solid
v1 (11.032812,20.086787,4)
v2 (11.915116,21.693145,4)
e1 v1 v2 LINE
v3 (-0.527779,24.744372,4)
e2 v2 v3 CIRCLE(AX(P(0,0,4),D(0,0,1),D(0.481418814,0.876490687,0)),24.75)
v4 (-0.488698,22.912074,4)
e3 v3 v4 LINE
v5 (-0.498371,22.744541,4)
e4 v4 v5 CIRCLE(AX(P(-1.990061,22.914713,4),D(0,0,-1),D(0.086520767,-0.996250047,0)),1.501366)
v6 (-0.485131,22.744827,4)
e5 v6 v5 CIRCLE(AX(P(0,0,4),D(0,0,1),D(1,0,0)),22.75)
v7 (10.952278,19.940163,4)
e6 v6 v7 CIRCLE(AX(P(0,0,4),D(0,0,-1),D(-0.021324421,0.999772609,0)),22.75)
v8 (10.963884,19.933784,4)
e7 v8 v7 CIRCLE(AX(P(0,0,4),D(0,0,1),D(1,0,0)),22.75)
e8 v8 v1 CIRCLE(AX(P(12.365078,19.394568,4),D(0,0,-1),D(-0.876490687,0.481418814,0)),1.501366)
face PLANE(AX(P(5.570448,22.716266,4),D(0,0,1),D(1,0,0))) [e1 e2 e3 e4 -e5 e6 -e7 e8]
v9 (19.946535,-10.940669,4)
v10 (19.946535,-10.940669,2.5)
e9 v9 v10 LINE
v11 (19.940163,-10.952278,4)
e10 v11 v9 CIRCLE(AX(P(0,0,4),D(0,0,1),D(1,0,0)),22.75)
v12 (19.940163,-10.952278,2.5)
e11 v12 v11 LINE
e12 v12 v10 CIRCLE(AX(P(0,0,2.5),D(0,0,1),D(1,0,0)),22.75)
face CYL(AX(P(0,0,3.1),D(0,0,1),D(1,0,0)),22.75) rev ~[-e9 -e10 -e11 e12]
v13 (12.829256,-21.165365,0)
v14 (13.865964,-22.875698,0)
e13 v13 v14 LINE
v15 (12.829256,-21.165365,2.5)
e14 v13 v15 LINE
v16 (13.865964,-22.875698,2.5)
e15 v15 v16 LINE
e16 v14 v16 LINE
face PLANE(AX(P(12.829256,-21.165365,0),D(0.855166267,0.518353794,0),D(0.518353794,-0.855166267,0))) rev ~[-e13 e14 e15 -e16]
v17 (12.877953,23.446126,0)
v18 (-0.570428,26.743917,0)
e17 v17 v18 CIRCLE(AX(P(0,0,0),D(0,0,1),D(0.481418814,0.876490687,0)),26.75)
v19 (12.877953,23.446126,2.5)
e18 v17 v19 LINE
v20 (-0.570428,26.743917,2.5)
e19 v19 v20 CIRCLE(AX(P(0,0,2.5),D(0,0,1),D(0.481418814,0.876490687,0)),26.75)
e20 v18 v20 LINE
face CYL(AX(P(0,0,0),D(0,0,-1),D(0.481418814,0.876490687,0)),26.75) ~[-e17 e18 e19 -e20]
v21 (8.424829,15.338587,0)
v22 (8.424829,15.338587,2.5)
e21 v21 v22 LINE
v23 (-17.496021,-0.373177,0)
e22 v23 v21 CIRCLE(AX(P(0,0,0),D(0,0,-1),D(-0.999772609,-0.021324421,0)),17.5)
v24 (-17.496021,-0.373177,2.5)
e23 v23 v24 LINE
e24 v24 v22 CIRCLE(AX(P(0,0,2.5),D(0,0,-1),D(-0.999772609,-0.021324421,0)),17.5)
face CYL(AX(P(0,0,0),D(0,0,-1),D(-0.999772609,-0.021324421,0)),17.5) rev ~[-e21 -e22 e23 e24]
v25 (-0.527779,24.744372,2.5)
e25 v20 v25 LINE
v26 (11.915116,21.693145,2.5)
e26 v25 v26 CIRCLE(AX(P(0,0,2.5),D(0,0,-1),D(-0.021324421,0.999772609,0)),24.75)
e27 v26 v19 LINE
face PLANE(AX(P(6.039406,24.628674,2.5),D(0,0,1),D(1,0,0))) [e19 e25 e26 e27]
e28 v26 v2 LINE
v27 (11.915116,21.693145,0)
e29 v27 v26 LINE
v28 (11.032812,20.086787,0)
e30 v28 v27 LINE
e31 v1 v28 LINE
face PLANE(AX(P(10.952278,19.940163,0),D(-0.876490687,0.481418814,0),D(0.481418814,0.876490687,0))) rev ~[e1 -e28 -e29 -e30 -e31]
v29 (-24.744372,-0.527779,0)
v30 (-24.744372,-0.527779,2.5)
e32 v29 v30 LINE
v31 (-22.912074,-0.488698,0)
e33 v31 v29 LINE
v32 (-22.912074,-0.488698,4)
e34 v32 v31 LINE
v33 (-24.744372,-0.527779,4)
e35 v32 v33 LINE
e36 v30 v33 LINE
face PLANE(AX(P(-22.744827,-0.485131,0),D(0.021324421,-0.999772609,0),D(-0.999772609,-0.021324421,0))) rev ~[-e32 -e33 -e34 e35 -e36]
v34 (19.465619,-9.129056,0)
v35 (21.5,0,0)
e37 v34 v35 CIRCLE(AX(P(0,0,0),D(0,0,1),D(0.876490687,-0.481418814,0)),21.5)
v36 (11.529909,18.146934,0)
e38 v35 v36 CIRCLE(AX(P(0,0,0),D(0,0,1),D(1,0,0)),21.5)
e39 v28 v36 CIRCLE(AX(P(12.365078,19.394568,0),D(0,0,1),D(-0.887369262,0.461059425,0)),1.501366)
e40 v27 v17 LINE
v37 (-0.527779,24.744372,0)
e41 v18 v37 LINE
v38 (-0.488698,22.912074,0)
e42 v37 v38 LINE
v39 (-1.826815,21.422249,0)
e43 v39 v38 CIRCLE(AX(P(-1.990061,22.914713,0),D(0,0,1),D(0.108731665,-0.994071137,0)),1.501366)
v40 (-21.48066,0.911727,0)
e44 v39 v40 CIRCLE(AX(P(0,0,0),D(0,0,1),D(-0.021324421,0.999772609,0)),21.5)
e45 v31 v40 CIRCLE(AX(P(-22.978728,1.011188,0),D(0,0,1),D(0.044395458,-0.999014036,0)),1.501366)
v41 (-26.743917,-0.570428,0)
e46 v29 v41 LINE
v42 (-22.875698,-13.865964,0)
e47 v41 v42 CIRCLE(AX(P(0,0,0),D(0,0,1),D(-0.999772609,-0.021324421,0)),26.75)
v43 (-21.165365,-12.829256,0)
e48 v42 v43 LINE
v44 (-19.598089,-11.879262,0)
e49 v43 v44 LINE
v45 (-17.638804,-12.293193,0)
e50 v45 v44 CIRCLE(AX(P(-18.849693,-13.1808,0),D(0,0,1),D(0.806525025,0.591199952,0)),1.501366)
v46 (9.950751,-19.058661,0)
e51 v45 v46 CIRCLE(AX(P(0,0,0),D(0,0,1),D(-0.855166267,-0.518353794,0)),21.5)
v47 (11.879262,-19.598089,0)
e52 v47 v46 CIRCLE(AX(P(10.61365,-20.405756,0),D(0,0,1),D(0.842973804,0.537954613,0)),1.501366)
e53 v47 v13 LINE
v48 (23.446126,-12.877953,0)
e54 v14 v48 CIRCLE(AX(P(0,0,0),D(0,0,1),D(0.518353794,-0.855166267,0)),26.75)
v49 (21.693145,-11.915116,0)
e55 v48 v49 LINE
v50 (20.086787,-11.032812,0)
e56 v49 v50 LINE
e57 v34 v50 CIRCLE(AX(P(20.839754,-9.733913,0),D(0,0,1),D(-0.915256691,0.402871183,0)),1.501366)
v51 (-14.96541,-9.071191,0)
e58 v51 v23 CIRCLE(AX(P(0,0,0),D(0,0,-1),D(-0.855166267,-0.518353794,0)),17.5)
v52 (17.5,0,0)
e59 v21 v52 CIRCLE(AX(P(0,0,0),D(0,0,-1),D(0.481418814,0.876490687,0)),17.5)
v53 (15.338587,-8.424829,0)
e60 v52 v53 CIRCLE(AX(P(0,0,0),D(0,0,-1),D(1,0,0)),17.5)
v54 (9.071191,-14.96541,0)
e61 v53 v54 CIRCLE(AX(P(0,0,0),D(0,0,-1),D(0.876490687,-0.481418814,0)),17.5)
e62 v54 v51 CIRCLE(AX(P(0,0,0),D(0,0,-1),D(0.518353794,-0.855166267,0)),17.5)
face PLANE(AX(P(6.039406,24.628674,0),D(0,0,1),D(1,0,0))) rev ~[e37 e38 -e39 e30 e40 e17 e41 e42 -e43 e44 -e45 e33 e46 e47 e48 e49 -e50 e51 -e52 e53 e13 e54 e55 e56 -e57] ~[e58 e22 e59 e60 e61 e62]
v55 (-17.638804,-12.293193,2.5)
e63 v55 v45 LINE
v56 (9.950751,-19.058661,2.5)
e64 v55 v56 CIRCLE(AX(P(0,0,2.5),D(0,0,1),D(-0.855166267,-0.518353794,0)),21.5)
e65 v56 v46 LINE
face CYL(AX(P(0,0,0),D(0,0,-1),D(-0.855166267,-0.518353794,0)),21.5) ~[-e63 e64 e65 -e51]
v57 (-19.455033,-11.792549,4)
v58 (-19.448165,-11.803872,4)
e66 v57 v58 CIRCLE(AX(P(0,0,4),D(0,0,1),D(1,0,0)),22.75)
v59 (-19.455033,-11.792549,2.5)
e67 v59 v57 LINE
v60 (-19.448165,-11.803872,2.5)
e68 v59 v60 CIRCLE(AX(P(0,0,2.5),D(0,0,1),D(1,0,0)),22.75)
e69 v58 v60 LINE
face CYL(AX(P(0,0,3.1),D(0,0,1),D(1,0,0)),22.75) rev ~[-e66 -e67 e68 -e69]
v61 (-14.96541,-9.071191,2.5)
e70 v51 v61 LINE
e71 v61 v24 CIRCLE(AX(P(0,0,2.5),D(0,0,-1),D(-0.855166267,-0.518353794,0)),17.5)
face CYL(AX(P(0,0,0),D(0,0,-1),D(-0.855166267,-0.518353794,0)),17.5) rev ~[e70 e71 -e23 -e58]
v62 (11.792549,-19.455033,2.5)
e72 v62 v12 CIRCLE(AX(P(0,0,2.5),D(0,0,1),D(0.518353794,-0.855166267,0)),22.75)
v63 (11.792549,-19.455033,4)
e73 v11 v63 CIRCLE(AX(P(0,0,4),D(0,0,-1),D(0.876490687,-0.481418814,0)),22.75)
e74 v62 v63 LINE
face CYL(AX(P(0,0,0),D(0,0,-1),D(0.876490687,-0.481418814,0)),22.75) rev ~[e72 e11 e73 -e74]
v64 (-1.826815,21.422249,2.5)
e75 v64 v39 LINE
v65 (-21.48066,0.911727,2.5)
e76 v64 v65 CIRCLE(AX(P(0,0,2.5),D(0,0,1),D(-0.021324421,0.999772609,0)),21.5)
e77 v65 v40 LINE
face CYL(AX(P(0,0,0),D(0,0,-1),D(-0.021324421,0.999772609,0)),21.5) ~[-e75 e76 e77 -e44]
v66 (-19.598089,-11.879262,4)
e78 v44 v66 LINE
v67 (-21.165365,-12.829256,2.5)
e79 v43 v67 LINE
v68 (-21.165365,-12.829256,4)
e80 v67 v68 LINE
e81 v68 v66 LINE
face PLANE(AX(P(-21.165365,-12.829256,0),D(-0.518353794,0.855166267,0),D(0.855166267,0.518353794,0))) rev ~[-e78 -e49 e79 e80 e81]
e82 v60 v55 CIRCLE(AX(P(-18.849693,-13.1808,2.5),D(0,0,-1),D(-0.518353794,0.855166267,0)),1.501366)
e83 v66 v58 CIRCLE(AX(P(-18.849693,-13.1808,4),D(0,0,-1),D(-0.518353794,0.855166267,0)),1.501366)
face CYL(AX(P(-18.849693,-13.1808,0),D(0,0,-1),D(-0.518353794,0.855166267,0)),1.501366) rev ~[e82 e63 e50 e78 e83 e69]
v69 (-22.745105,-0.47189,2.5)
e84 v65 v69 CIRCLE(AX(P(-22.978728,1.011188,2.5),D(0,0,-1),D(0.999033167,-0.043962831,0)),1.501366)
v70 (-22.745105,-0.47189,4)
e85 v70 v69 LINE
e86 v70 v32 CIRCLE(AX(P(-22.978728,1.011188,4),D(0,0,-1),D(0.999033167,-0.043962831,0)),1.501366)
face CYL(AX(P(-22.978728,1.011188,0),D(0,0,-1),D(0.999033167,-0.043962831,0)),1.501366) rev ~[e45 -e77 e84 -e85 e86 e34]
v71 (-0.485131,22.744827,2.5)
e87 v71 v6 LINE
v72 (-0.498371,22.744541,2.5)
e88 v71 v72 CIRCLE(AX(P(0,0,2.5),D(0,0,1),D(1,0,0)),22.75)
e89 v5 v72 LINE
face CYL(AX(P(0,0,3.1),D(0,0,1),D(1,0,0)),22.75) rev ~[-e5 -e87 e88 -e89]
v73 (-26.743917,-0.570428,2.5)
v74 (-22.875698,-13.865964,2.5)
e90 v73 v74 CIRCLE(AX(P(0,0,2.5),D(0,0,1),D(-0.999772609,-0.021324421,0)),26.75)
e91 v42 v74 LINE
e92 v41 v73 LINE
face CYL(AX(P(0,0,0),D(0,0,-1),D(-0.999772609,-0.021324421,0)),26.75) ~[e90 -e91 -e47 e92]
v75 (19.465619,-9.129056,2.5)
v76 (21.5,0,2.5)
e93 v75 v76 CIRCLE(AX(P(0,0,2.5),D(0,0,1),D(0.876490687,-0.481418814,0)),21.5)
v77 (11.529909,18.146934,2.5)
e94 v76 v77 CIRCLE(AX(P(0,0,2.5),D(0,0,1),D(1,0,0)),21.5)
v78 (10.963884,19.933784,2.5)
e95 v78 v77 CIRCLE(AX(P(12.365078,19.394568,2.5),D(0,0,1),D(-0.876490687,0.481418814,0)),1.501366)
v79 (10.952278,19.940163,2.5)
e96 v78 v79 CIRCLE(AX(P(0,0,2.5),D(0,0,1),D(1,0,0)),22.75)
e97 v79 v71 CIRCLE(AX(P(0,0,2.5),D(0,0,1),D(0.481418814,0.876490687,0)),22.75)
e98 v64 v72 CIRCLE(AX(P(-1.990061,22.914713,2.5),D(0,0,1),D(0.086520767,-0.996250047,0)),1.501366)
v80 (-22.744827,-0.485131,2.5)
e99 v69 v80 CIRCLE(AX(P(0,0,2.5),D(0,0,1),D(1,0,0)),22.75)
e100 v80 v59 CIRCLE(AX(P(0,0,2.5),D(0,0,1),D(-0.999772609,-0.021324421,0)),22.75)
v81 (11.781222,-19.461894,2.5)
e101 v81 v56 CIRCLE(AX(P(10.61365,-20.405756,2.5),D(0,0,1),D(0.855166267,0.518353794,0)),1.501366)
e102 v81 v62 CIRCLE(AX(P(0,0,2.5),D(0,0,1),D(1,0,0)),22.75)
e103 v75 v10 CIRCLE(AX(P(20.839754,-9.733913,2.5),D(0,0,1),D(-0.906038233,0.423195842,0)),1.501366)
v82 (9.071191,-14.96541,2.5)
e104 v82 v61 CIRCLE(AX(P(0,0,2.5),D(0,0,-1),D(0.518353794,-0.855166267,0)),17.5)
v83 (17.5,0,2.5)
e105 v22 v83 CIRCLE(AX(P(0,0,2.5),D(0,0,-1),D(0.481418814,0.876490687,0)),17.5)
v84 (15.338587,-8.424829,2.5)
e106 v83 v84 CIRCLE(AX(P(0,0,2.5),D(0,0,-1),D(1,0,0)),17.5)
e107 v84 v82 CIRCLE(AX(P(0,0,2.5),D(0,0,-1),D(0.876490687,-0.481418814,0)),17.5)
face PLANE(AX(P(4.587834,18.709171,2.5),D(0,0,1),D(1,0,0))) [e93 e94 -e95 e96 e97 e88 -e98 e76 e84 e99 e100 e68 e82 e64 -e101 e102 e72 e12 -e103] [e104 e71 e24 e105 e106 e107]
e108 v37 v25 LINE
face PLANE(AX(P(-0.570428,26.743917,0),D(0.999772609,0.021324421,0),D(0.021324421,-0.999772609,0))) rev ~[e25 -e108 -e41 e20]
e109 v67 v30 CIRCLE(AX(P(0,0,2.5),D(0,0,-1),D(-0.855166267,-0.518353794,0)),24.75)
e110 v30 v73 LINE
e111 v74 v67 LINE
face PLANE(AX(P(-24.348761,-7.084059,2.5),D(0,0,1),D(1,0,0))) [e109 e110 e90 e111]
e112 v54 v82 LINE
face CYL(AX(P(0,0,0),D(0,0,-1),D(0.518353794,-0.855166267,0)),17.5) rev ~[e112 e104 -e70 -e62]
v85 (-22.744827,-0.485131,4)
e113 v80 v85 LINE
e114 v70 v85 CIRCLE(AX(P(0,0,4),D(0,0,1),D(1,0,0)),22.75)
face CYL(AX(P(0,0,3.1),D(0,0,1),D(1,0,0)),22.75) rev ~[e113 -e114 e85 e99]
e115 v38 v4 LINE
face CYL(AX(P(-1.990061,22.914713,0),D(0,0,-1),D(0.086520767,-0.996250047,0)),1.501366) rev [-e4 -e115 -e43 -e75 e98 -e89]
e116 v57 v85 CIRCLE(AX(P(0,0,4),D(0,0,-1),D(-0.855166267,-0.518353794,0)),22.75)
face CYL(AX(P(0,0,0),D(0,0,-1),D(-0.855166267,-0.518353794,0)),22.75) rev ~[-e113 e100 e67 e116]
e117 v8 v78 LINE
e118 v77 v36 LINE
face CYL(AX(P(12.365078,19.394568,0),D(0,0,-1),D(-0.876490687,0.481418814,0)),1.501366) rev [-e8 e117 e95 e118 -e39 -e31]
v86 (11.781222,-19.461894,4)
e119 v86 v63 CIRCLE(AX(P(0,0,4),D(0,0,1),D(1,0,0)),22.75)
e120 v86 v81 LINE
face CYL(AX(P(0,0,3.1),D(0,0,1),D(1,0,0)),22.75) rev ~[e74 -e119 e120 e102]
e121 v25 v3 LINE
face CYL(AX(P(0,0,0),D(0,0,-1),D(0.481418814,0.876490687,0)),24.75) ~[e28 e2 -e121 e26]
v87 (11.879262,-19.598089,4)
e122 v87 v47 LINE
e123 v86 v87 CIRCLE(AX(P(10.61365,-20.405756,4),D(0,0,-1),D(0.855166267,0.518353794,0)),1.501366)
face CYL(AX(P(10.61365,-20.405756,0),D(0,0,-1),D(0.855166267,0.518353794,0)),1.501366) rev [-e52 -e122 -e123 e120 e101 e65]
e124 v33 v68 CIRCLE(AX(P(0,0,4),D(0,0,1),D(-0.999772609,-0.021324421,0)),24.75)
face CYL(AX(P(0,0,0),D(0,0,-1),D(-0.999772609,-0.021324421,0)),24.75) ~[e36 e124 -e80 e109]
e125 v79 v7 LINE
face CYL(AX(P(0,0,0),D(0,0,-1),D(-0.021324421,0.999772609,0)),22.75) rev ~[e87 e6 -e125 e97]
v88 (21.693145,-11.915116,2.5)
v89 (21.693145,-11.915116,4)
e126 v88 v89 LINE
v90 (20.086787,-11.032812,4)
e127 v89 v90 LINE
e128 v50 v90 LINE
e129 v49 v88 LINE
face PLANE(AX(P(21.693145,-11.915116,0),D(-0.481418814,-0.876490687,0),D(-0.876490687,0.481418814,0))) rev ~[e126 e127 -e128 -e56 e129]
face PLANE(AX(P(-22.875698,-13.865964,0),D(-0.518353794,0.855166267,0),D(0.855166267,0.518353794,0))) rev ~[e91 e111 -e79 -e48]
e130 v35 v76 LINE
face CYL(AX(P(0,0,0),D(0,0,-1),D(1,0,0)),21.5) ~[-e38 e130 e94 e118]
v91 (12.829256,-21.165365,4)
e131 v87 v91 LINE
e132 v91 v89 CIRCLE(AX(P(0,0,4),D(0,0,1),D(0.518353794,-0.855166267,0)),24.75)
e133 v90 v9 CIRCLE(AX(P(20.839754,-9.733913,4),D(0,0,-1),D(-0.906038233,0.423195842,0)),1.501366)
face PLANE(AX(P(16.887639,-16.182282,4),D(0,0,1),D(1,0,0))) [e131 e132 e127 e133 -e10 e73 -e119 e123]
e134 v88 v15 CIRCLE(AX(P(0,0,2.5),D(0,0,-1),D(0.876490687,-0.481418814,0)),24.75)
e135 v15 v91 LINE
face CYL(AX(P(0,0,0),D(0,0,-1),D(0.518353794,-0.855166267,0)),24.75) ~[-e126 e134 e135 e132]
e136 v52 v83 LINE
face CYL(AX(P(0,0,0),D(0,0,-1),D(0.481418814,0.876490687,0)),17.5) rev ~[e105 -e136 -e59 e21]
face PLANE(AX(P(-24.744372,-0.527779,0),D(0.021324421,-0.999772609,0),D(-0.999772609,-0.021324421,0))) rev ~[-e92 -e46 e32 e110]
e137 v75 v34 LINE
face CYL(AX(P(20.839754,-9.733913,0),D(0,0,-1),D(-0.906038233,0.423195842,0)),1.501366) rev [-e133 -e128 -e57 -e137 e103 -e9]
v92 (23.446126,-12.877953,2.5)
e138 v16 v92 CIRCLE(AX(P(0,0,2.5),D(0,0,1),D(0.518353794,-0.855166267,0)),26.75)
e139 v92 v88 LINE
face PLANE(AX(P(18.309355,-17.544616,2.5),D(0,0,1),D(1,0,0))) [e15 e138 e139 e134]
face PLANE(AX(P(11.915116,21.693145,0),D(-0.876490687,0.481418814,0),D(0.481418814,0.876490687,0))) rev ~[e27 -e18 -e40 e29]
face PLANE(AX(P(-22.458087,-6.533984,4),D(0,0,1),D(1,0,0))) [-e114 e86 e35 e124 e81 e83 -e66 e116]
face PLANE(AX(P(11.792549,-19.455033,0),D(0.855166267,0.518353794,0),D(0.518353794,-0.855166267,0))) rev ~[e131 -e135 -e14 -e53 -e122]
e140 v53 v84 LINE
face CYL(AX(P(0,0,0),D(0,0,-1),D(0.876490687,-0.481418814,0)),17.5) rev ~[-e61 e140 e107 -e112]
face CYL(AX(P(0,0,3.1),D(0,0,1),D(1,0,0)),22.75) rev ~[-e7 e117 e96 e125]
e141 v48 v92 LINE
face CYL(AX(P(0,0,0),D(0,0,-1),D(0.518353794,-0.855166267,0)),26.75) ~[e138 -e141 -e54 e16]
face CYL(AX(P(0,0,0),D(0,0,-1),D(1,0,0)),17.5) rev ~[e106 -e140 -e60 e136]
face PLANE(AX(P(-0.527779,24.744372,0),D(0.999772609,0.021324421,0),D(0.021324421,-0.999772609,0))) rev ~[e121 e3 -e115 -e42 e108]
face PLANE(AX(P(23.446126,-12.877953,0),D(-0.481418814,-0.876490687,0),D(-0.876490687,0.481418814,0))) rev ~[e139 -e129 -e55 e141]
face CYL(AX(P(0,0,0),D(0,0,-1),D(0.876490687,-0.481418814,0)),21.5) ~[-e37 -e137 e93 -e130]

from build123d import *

# Parameters (mm, degrees)
F1_DEPTH     = 4
F2_DEPTH     = 2.5
F3_T3_DEPTH  = 2.5
F3_T6_DEPTH  = 6.1298487604
F3_S8_R      = 22.75
F3_T9_DEPTH  = 5
F3_T12_DEPTH = 2.5
F3_T15_DEPTH = 6.1298487604
F3_S16_R     = 22.75
F3_T17_DEPTH = 5
F3_T21_DEPTH = 2.5
F3_T24_DEPTH = 6.1298487604
F3_S25_R     = 22.75
F3_T26_DEPTH = 5
F3_T30_DEPTH = 2.5
F3_T33_DEPTH = 6.1298487604
F3_S35_R     = 22.75
F3_T36_DEPTH = 5
F3_T39_DEPTH = 2.5
F3_T42_DEPTH = 6.1298487604
F3_S44_R     = 22.75
F3_T45_DEPTH = 5
F3_T48_DEPTH = 2.5
F3_T51_DEPTH = 6.1298487604
F3_S53_R     = 22.75
F3_T54_DEPTH = 5


# Not quite as in the source:
# - a fillet or chamfer that OpenCascade refuses, or shapes differently, is made with other operations: its cross-section is extruded or revolved along the edge and cut away or added


with BuildPart() as f1:
    # F0 (on Top) → F1 (new body)
    with BuildSketch(Plane.XY):
        with BuildLine():
            Line((10.952278028, 19.9401631387), (11.9151156568, 21.6931445135))
            ThreePointArc((11.9151156568, 21.6931445135), (5.8945189879, 24.0378273956), (-0.5277794089, 24.7443720651))
            Line((-0.5277794089, 24.7443720651), (-0.4851305678, 22.7448268477))
            ThreePointArc((-0.4851305678, 22.7448268477), (5.4181942212, 22.095376697), (10.952278028, 19.9401631387))
        make_face()
    extrude(amount=F1_DEPTH)



with BuildPart() as f1b:
    # F0 (on Top) → F1, piece 2 (new body)
    with BuildSketch(Plane.XY):
        with BuildLine():
            Line((-22.7448268477, -0.4851305678), (-24.7443720651, -0.5277794089))
            ThreePointArc((-24.7443720651, -0.5277794089), (-23.7646286703, -6.9141105112), (-21.1653651046, -12.8292564083))
            Line((-21.1653651046, -12.8292564083), (-19.4550325709, -11.7925488197))
            ThreePointArc((-19.4550325709, -11.7925488197), (-21.8442546364, -6.3553945103), (-22.7448268477, -0.4851305678))
        make_face()
    extrude(amount=F1_DEPTH)


with BuildPart() as f1c:
    # F0 (on Top) → F1, piece 3 (new body)
    with BuildSketch(Plane.XY):
        with BuildLine():
            ThreePointArc((12.8292564083, -21.1653651046), (17.8701096825, -17.1237168844), (21.6931445135, -11.9151156568))
            Line((21.6931445135, -11.9151156568), (19.9401631387, -10.952278028))
            ThreePointArc((19.9401631387, -10.952278028), (16.4260604152, -15.7399821867), (11.7925488197, -19.4550325709))
            Line((11.7925488197, -19.4550325709), (12.8292564083, -21.1653651046))
        make_face()
    extrude(amount=F1_DEPTH)


with BuildPart() as f1_1:
    add(f1.part)

    add(f1b.part)  # F2 merges F1b

    add(f1c.part)  # F2 merges F1c
    # F0 (on Top) → F2 (join)
    with BuildSketch(Plane.XY):
        with BuildLine():
            Line((11.9151156568, 21.6931445135), (12.8779532856, 23.4461258884))
            ThreePointArc((12.8779532856, 23.4461258884), (6.3708437546, 25.9802780943), (-0.5704282501, 26.7439172825))
            Line((-0.5704282501, 26.7439172825), (-0.5277794089, 24.7443720651))
            ThreePointArc((-0.5277794089, 24.7443720651), (5.8945189879, 24.0378273956), (11.9151156568, 21.6931445135))
        make_face()
        with BuildLine():
            Line((-24.7443720651, -0.5277794089), (-26.7439172825, -0.5704282501))
            ThreePointArc((-26.7439172825, -0.5704282501), (-25.6850027043, -7.4728265121), (-22.8756976383, -13.8659639968))
            Line((-22.8756976383, -13.8659639968), (-21.1653651046, -12.8292564083))
            ThreePointArc((-21.1653651046, -12.8292564083), (-23.7646286703, -6.9141105112), (-24.7443720651, -0.5277794089))
        make_face()
        with BuildLine():
            ThreePointArc((13.8659639968, -22.8756976383), (19.3141589497, -18.5074515821), (23.4461258884, -12.8779532856))
            Line((23.4461258884, -12.8779532856), (21.6931445135, -11.9151156568))
            ThreePointArc((21.6931445135, -11.9151156568), (17.8701096825, -17.1237168844), (12.8292564083, -21.1653651046))
            Line((12.8292564083, -21.1653651046), (13.8659639968, -22.8756976383))
        make_face()
        with BuildLine():
            Line((8.4248292523, 15.3385870298), (10.35050451, 18.8445497794))
            ThreePointArc((10.35050451, 18.8445497794), (5.120491242, 20.8813450103), (-0.4584750421, 21.4951110868))
            Line((-0.4584750421, 21.4951110868), (-0.3731773599, 17.4960206521))
            ThreePointArc((-0.3731773599, 17.4960206521), (4.1678417086, 16.9964436131), (8.4248292523, 15.3385870298))
        make_face()
        with BuildLine():
            Line((-0.3731773599, 17.4960206521), (-0.4584750421, 21.4951110868))
            ThreePointArc((-0.4584750421, 21.4951110868), (-15.5235296231, 14.8751480006), (-21.4951110868, -0.4584750421))
            Line((-21.4951110868, -0.4584750421), (-17.4960206521, -0.3731773599))
            ThreePointArc((-17.4960206521, -0.3731773599), (-12.6354310886, 12.1076786051), (-0.3731773599, 17.4960206521))
        make_face()
        with BuildLine():
            Line((-17.4960206521, -0.3731773599), (-21.4951110868, -0.4584750421))
            ThreePointArc((-21.4951110868, -0.4584750421), (-20.6440208651, -6.0061970097), (-18.3860747373, -11.1446065769))
            Line((-18.3860747373, -11.1446065769), (-14.9654096699, -9.0711913998))
            ThreePointArc((-14.9654096699, -9.0711913998), (-16.8032727972, -4.8887650079), (-17.4960206521, -0.3731773599))
        make_face()
        with BuildLine():
            ThreePointArc((-18.3860747373, -11.1446065769), (-5.120491242, -20.8813450103), (11.1446065769, -18.3860747373))
            Line((11.1446065769, -18.3860747373), (9.0711913998, -14.9654096699))
            ThreePointArc((9.0711913998, -14.9654096699), (-4.1678417086, -16.9964436131), (-14.9654096699, -9.0711913998))
            Line((-14.9654096699, -9.0711913998), (-18.3860747373, -11.1446065769))
        make_face()
        with BuildLine():
            ThreePointArc((11.1446065769, -18.3860747373), (15.5235296231, -14.8751480006), (18.8445497794, -10.35050451))
            Line((18.8445497794, -10.35050451), (15.3385870298, -8.4248292523))
            ThreePointArc((15.3385870298, -8.4248292523), (12.6354310886, -12.1076786051), (9.0711913998, -14.9654096699))
            Line((9.0711913998, -14.9654096699), (11.1446065769, -18.3860747373))
        make_face()
        with BuildLine():
            ThreePointArc((21.5, 0), (18.5038623936, 10.9479256719), (10.35050451, 18.8445497794))
            Line((10.35050451, 18.8445497794), (8.4248292523, 15.3385870298))
            ThreePointArc((8.4248292523, 15.3385870298), (15.0612833436, 8.9111022911), (17.5, 0))
            ThreePointArc((17.5, 0), (16.9510364435, -4.3488347278), (15.3385870298, -8.4248292523))
            Line((15.3385870298, -8.4248292523), (18.8445497794, -10.35050451))
            ThreePointArc((18.8445497794, -10.35050451), (20.8255590592, -5.3428540941), (21.5, 0))
        make_face()
        with BuildLine():
            Line((-21.4951110868, -0.4584750421), (-22.7448268477, -0.4851305678))
            ThreePointArc((-22.7448268477, -0.4851305678), (-21.8442546364, -6.3553945103), (-19.4550325709, -11.7925488197))
            Line((-19.4550325709, -11.7925488197), (-18.3860747373, -11.1446065769))
            ThreePointArc((-18.3860747373, -11.1446065769), (-20.6440208651, -6.0061970097), (-21.4951110868, -0.4584750421))
        make_face()
        with BuildLine():
            ThreePointArc((11.7925488197, -19.4550325709), (16.4260604152, -15.7399821867), (19.9401631387, -10.952278028))
            Line((19.9401631387, -10.952278028), (18.8445497794, -10.35050451))
            ThreePointArc((18.8445497794, -10.35050451), (15.5235296231, -14.8751480006), (11.1446065769, -18.3860747373))
            Line((11.1446065769, -18.3860747373), (11.7925488197, -19.4550325709))
        make_face()
        with BuildLine():
            Line((10.35050451, 18.8445497794), (10.952278028, 19.9401631387))
            ThreePointArc((10.952278028, 19.9401631387), (5.4181942212, 22.095376697), (-0.4851305678, 22.7448268477))
            Line((-0.4851305678, 22.7448268477), (-0.4584750421, 21.4951110868))
            ThreePointArc((-0.4584750421, 21.4951110868), (5.120491242, 20.8813450103), (10.35050451, 18.8445497794))
        make_face()
    extrude(amount=F2_DEPTH)

    # F3: fillet of radius 1.5 on 6 edges, made by hand


with BuildPart() as f3_tool1:
    # F3_s2 → F3_t3 (new body)
    with BuildSketch(Plane.XY):
        with BuildLine():
            ThreePointArc((-19.6279317172, -11.8968828329), (-18.539917703, -11.7117398386), (-17.6192977153, -12.3204362009))
            Line((-17.6192977153, -12.3204362009), (-17.496258175, -12.2343998089))
            ThreePointArc((-17.496258175, -12.2343998089), (-17.8866718738, -11.6569137348), (-18.2576830085, -11.0667827169))
            Line((-18.2576830085, -11.0667827169), (-18.4638985973, -11.016214848))
            ThreePointArc((-18.4638985973, -11.016214848), (-19.0847234165, -11.3925240093), (-19.7057555772, -11.768491104))
            Line((-19.7057555772, -11.768491104), (-19.6279317172, -11.8968828329))
        make_face()
    extrude(amount=F3_T3_DEPTH)


with BuildPart() as f3_tool4:
    # F3_s5 → F3_t6 (new body)
    with BuildSketch(Plane.XY):
        with BuildLine():
            ThreePointArc((-19.6279317172, -11.8968828329), (-18.539917703, -11.7117398386), (-17.6192977153, -12.3204362009))
            Line((-17.6192977153, -12.3204362009), (-17.496258175, -12.2343998089))
            ThreePointArc((-17.496258175, -12.2343998089), (-17.8866718738, -11.6569137348), (-18.2576830085, -11.0667827169))
            Line((-18.2576830085, -11.0667827169), (-18.4638985973, -11.016214848))
            ThreePointArc((-18.4638985973, -11.016214848), (-19.0847234165, -11.3925240093), (-19.7057555772, -11.768491104))
            Line((-19.7057555772, -11.768491104), (-19.6279317172, -11.8968828329))
        make_face()
    extrude(amount=F3_T6_DEPTH)

    split(bisect_by=Plane.XY.offset(4), keep=Keep.BOTTOM)

    # F3_s8 → F3_t9 (cut, symmetric)
    with BuildSketch(Plane.XY.offset(3.1)):
        Circle(F3_S8_R)
    extrude(amount=F3_T9_DEPTH, both=True, mode=Mode.SUBTRACT)


with BuildPart() as f3_tool10:
    # F3_s11 → F3_t12 (new body)
    with BuildSketch(Plane.XY):
        with BuildLine():
            ThreePointArc((11.8975669659, -19.6275170342), (11.0186307447, -18.9600415346), (9.9208540079, -19.0737897628))
            Line((9.9208540079, -19.0737897628), (9.851574441, -18.9405931757))
            ThreePointArc((9.851574441, -18.9405931757), (10.4648544282, -18.6092313204), (11.0667827169, -18.2576830085))
            Line((11.0667827169, -18.2576830085), (11.2729983057, -18.3082508774))
            ThreePointArc((11.2729983057, -18.3082508774), (11.649307467, -18.9290756965), (12.0259586947, -19.5496931742))
            Line((12.0259586947, -19.5496931742), (11.8975669659, -19.6275170342))
        make_face()
    extrude(amount=F3_T12_DEPTH)


with BuildPart() as f3_tool13:
    # F3_s14 → F3_t15 (new body)
    with BuildSketch(Plane.XY):
        with BuildLine():
            ThreePointArc((11.8975669659, -19.6275170342), (11.0186307447, -18.9600415346), (9.9208540079, -19.0737897628))
            Line((9.9208540079, -19.0737897628), (9.851574441, -18.9405931757))
            ThreePointArc((9.851574441, -18.9405931757), (10.4648544282, -18.6092313204), (11.0667827169, -18.2576830085))
            Line((11.0667827169, -18.2576830085), (11.2729983057, -18.3082508774))
            ThreePointArc((11.2729983057, -18.3082508774), (11.649307467, -18.9290756965), (12.0259586947, -19.5496931742))
            Line((12.0259586947, -19.5496931742), (11.8975669659, -19.6275170342))
        make_face()
    extrude(amount=F3_T15_DEPTH)

    # F3_s16 → F3_t17 (cut, symmetric)
    with BuildSketch(Plane.XY.offset(3.1)):
        Circle(F3_S16_R)
    extrude(amount=F3_T17_DEPTH, both=True, mode=Mode.SUBTRACT)

    split(bisect_by=Plane.XY.offset(4), keep=Keep.BOTTOM)


with BuildPart() as f3_tool19:
    # F3_s20 → F3_t21 (new body)
    with BuildSketch(Plane.XY):
        with BuildLine():
            ThreePointArc((19.4794595933, -9.0985413178), (19.4126230743, -10.2001697956), (20.1169686177, -11.0498460744))
            Line((20.1169686177, -11.0498460744), (20.0446900489, -11.1814393786))
            ThreePointArc((20.0446900489, -11.1814393786), (19.4085769135, -10.8315932982), (18.7722712106, -10.4820978141))
            Line((18.7722712106, -10.4820978141), (18.7129564753, -10.2782259411))
            ThreePointArc((18.7129564753, -10.2782259411), (19.038519361, -9.6618553644), (19.3434301221, -9.0350041463))
            Line((19.3434301221, -9.0350041463), (19.4794595933, -9.0985413178))
        make_face()
    extrude(amount=F3_T21_DEPTH)


with BuildPart() as f3_tool22:
    # F3_s23 → F3_t24 (new body)
    with BuildSketch(Plane.XY):
        with BuildLine():
            ThreePointArc((19.4794595933, -9.0985413178), (19.4126230743, -10.2001697956), (20.1169686177, -11.0498460744))
            Line((20.1169686177, -11.0498460744), (20.0446900489, -11.1814393786))
            ThreePointArc((20.0446900489, -11.1814393786), (19.4085769135, -10.8315932982), (18.7722712106, -10.4820978141))
            Line((18.7722712106, -10.4820978141), (18.7129564753, -10.2782259411))
            ThreePointArc((18.7129564753, -10.2782259411), (19.038519361, -9.6618553644), (19.3434301221, -9.0350041463))
            Line((19.3434301221, -9.0350041463), (19.4794595933, -9.0985413178))
        make_face()
    extrude(amount=F3_T24_DEPTH)

    # F3_s25 → F3_t26 (cut, symmetric)
    with BuildSketch(Plane.XY.offset(3.1)):
        Circle(F3_S25_R)
    extrude(amount=F3_T26_DEPTH, both=True, mode=Mode.SUBTRACT)

    split(bisect_by=Plane.XY.offset(4), keep=Keep.BOTTOM)


with BuildPart() as f3_tool28:
    # F3_s29 → F3_t30 (new body)
    with BuildSketch(Plane.XY):
        with BuildLine():
            ThreePointArc((11.0491448819, 20.1173537527), (10.9105622534, 19.0224349072), (11.557959477, 18.1286064795))
            Line((11.557959477, 18.1286064795), (11.4772476324, 18.002010321))
            ThreePointArc((11.4772476324, 18.002010321), (10.8836398543, 18.367445442), (10.2782259411, 18.7129564753))
            Line((10.2782259411, 18.7129564753), (10.2189112058, 18.9168283483))
            ThreePointArc((10.2189112058, 18.9168283483), (10.5684066899, 19.5531340512), (10.9175515777, 20.1896323216))
            Line((10.9175515777, 20.1896323216), (11.0491448819, 20.1173537527))
        make_face()
    extrude(amount=F3_T30_DEPTH)


with BuildPart() as f3_tool31:
    # F3_s32 → F3_t33 (new body)
    with BuildSketch(Plane.XY):
        with BuildLine():
            ThreePointArc((11.0491448819, 20.1173537527), (10.9105622534, 19.0224349072), (11.557959477, 18.1286064795))
            Line((11.557959477, 18.1286064795), (11.4772476324, 18.002010321))
            ThreePointArc((11.4772476324, 18.002010321), (10.8836398543, 18.367445442), (10.2782259411, 18.7129564753))
            Line((10.2782259411, 18.7129564753), (10.2189112058, 18.9168283483))
            ThreePointArc((10.2189112058, 18.9168283483), (10.5684066899, 19.5531340512), (10.9175515777, 20.1896323216))
            Line((10.9175515777, 20.1896323216), (11.0491448819, 20.1173537527))
        make_face()
    extrude(amount=F3_T33_DEPTH)

    split(bisect_by=Plane.XY.offset(4), keep=Keep.BOTTOM)

    # F3_s35 → F3_t36 (cut, symmetric)
    with BuildSketch(Plane.XY.offset(3.1)):
        Circle(F3_S35_R)
    extrude(amount=F3_T36_DEPTH, both=True, mode=Mode.SUBTRACT)


with BuildPart() as f3_tool37:
    # F3_s38 → F3_t39 (new body)
    with BuildSketch(Plane.XY):
        with BuildLine():
            ThreePointArc((-1.8601618781, 21.4189775187), (-0.8727053713, 21.9119096342), (-0.4890369005, 22.9467289073))
            Line((-0.4890369005, 22.9467289073), (-0.3389344717, 22.9499304826))
            ThreePointArc((-0.3389344717, 22.9499304826), (-0.323853497, 22.2241173075), (-0.3083726133, 21.4983126622))
            Line((-0.3083726133, 21.4983126622), (-0.4552734668, 21.3450086581))
            ThreePointArc((-0.4552734668, 21.3450086581), (-1.1518474872, 21.3187690993), (-1.847171947, 21.2694039552))
            Line((-1.847171947, 21.2694039552), (-1.8601618781, 21.4189775187))
        make_face()
    extrude(amount=F3_T39_DEPTH)


with BuildPart() as f3_tool40:
    # F3_s41 → F3_t42 (new body)
    with BuildSketch(Plane.XY):
        with BuildLine():
            ThreePointArc((-1.8601618781, 21.4189775187), (-0.8727053713, 21.9119096342), (-0.4890369005, 22.9467289073))
            Line((-0.4890369005, 22.9467289073), (-0.3389344717, 22.9499304826))
            ThreePointArc((-0.3389344717, 22.9499304826), (-0.323853497, 22.2241173075), (-0.3083726133, 21.4983126622))
            Line((-0.3083726133, 21.4983126622), (-0.4552734668, 21.3450086581))
            ThreePointArc((-0.4552734668, 21.3450086581), (-1.1518474872, 21.3187690993), (-1.847171947, 21.2694039552))
            Line((-1.847171947, 21.2694039552), (-1.8601618781, 21.4189775187))
        make_face()
    extrude(amount=F3_T42_DEPTH)

    split(bisect_by=Plane.XY.offset(4), keep=Keep.BOTTOM)

    # F3_s44 → F3_t45 (cut, symmetric)
    with BuildSketch(Plane.XY.offset(3.1)):
        Circle(F3_S44_R)
    extrude(amount=F3_T45_DEPTH, both=True, mode=Mode.SUBTRACT)


with BuildPart() as f3_tool46:
    # F3_s47 → F3_t48 (new body)
    with BuildSketch(Plane.XY):
        with BuildLine():
            ThreePointArc((-21.4788134849, 0.9451832833), (-21.9291929982, -0.0623933726), (-22.9467118477, -0.4898367186))
            Line((-22.9467118477, -0.4898367186), (-22.9435102724, -0.6399391474))
            ThreePointArc((-22.9435102724, -0.6399391474), (-22.2177141568, -0.6240583546), (-21.4919095115, -0.6085774709))
            Line((-21.4919095115, -0.6085774709), (-21.3450086581, -0.4552734668))
            ThreePointArc((-21.3450086581, -0.4552734668), (-21.3484942825, 0.2417858785), (-21.3288220733, 0.9385828547))
            Line((-21.3288220733, 0.9385828547), (-21.4788134849, 0.9451832833))
        make_face()
    extrude(amount=F3_T48_DEPTH)


with BuildPart() as f3_tool49:
    # F3_s50 → F3_t51 (new body)
    with BuildSketch(Plane.XY):
        with BuildLine():
            ThreePointArc((-21.4788134849, 0.9451832833), (-21.9291929982, -0.0623933726), (-22.9467118477, -0.4898367186))
            Line((-22.9467118477, -0.4898367186), (-22.9435102724, -0.6399391474))
            ThreePointArc((-22.9435102724, -0.6399391474), (-22.2177141568, -0.6240583546), (-21.4919095115, -0.6085774709))
            Line((-21.4919095115, -0.6085774709), (-21.3450086581, -0.4552734668))
            ThreePointArc((-21.3450086581, -0.4552734668), (-21.3484942825, 0.2417858785), (-21.3288220733, 0.9385828547))
            Line((-21.3288220733, 0.9385828547), (-21.4788134849, 0.9451832833))
        make_face()
    extrude(amount=F3_T51_DEPTH)

    split(bisect_by=Plane.XY.offset(4), keep=Keep.BOTTOM)

    # F3_s53 → F3_t54 (cut, symmetric)
    with BuildSketch(Plane.XY.offset(3.1)):
        Circle(F3_S53_R)
    extrude(amount=F3_T54_DEPTH, both=True, mode=Mode.SUBTRACT)


with BuildPart() as f1_2:
    add(f1_1.part)

    # F3_t55: union F3_tool1, F3_tool4, F3_tool10, F3_tool13, F3_tool19, F3_tool22, F3_tool28, F3_tool31, F3_tool37, F3_tool40, F3_tool46, F3_tool49
    add([f3_tool1.part, f3_tool4.part, f3_tool10.part, f3_tool13.part, f3_tool19.part, f3_tool22.part, f3_tool28.part, f3_tool31.part, f3_tool37.part, f3_tool40.part, f3_tool46.part, f3_tool49.part])


solid = f1_2.part
